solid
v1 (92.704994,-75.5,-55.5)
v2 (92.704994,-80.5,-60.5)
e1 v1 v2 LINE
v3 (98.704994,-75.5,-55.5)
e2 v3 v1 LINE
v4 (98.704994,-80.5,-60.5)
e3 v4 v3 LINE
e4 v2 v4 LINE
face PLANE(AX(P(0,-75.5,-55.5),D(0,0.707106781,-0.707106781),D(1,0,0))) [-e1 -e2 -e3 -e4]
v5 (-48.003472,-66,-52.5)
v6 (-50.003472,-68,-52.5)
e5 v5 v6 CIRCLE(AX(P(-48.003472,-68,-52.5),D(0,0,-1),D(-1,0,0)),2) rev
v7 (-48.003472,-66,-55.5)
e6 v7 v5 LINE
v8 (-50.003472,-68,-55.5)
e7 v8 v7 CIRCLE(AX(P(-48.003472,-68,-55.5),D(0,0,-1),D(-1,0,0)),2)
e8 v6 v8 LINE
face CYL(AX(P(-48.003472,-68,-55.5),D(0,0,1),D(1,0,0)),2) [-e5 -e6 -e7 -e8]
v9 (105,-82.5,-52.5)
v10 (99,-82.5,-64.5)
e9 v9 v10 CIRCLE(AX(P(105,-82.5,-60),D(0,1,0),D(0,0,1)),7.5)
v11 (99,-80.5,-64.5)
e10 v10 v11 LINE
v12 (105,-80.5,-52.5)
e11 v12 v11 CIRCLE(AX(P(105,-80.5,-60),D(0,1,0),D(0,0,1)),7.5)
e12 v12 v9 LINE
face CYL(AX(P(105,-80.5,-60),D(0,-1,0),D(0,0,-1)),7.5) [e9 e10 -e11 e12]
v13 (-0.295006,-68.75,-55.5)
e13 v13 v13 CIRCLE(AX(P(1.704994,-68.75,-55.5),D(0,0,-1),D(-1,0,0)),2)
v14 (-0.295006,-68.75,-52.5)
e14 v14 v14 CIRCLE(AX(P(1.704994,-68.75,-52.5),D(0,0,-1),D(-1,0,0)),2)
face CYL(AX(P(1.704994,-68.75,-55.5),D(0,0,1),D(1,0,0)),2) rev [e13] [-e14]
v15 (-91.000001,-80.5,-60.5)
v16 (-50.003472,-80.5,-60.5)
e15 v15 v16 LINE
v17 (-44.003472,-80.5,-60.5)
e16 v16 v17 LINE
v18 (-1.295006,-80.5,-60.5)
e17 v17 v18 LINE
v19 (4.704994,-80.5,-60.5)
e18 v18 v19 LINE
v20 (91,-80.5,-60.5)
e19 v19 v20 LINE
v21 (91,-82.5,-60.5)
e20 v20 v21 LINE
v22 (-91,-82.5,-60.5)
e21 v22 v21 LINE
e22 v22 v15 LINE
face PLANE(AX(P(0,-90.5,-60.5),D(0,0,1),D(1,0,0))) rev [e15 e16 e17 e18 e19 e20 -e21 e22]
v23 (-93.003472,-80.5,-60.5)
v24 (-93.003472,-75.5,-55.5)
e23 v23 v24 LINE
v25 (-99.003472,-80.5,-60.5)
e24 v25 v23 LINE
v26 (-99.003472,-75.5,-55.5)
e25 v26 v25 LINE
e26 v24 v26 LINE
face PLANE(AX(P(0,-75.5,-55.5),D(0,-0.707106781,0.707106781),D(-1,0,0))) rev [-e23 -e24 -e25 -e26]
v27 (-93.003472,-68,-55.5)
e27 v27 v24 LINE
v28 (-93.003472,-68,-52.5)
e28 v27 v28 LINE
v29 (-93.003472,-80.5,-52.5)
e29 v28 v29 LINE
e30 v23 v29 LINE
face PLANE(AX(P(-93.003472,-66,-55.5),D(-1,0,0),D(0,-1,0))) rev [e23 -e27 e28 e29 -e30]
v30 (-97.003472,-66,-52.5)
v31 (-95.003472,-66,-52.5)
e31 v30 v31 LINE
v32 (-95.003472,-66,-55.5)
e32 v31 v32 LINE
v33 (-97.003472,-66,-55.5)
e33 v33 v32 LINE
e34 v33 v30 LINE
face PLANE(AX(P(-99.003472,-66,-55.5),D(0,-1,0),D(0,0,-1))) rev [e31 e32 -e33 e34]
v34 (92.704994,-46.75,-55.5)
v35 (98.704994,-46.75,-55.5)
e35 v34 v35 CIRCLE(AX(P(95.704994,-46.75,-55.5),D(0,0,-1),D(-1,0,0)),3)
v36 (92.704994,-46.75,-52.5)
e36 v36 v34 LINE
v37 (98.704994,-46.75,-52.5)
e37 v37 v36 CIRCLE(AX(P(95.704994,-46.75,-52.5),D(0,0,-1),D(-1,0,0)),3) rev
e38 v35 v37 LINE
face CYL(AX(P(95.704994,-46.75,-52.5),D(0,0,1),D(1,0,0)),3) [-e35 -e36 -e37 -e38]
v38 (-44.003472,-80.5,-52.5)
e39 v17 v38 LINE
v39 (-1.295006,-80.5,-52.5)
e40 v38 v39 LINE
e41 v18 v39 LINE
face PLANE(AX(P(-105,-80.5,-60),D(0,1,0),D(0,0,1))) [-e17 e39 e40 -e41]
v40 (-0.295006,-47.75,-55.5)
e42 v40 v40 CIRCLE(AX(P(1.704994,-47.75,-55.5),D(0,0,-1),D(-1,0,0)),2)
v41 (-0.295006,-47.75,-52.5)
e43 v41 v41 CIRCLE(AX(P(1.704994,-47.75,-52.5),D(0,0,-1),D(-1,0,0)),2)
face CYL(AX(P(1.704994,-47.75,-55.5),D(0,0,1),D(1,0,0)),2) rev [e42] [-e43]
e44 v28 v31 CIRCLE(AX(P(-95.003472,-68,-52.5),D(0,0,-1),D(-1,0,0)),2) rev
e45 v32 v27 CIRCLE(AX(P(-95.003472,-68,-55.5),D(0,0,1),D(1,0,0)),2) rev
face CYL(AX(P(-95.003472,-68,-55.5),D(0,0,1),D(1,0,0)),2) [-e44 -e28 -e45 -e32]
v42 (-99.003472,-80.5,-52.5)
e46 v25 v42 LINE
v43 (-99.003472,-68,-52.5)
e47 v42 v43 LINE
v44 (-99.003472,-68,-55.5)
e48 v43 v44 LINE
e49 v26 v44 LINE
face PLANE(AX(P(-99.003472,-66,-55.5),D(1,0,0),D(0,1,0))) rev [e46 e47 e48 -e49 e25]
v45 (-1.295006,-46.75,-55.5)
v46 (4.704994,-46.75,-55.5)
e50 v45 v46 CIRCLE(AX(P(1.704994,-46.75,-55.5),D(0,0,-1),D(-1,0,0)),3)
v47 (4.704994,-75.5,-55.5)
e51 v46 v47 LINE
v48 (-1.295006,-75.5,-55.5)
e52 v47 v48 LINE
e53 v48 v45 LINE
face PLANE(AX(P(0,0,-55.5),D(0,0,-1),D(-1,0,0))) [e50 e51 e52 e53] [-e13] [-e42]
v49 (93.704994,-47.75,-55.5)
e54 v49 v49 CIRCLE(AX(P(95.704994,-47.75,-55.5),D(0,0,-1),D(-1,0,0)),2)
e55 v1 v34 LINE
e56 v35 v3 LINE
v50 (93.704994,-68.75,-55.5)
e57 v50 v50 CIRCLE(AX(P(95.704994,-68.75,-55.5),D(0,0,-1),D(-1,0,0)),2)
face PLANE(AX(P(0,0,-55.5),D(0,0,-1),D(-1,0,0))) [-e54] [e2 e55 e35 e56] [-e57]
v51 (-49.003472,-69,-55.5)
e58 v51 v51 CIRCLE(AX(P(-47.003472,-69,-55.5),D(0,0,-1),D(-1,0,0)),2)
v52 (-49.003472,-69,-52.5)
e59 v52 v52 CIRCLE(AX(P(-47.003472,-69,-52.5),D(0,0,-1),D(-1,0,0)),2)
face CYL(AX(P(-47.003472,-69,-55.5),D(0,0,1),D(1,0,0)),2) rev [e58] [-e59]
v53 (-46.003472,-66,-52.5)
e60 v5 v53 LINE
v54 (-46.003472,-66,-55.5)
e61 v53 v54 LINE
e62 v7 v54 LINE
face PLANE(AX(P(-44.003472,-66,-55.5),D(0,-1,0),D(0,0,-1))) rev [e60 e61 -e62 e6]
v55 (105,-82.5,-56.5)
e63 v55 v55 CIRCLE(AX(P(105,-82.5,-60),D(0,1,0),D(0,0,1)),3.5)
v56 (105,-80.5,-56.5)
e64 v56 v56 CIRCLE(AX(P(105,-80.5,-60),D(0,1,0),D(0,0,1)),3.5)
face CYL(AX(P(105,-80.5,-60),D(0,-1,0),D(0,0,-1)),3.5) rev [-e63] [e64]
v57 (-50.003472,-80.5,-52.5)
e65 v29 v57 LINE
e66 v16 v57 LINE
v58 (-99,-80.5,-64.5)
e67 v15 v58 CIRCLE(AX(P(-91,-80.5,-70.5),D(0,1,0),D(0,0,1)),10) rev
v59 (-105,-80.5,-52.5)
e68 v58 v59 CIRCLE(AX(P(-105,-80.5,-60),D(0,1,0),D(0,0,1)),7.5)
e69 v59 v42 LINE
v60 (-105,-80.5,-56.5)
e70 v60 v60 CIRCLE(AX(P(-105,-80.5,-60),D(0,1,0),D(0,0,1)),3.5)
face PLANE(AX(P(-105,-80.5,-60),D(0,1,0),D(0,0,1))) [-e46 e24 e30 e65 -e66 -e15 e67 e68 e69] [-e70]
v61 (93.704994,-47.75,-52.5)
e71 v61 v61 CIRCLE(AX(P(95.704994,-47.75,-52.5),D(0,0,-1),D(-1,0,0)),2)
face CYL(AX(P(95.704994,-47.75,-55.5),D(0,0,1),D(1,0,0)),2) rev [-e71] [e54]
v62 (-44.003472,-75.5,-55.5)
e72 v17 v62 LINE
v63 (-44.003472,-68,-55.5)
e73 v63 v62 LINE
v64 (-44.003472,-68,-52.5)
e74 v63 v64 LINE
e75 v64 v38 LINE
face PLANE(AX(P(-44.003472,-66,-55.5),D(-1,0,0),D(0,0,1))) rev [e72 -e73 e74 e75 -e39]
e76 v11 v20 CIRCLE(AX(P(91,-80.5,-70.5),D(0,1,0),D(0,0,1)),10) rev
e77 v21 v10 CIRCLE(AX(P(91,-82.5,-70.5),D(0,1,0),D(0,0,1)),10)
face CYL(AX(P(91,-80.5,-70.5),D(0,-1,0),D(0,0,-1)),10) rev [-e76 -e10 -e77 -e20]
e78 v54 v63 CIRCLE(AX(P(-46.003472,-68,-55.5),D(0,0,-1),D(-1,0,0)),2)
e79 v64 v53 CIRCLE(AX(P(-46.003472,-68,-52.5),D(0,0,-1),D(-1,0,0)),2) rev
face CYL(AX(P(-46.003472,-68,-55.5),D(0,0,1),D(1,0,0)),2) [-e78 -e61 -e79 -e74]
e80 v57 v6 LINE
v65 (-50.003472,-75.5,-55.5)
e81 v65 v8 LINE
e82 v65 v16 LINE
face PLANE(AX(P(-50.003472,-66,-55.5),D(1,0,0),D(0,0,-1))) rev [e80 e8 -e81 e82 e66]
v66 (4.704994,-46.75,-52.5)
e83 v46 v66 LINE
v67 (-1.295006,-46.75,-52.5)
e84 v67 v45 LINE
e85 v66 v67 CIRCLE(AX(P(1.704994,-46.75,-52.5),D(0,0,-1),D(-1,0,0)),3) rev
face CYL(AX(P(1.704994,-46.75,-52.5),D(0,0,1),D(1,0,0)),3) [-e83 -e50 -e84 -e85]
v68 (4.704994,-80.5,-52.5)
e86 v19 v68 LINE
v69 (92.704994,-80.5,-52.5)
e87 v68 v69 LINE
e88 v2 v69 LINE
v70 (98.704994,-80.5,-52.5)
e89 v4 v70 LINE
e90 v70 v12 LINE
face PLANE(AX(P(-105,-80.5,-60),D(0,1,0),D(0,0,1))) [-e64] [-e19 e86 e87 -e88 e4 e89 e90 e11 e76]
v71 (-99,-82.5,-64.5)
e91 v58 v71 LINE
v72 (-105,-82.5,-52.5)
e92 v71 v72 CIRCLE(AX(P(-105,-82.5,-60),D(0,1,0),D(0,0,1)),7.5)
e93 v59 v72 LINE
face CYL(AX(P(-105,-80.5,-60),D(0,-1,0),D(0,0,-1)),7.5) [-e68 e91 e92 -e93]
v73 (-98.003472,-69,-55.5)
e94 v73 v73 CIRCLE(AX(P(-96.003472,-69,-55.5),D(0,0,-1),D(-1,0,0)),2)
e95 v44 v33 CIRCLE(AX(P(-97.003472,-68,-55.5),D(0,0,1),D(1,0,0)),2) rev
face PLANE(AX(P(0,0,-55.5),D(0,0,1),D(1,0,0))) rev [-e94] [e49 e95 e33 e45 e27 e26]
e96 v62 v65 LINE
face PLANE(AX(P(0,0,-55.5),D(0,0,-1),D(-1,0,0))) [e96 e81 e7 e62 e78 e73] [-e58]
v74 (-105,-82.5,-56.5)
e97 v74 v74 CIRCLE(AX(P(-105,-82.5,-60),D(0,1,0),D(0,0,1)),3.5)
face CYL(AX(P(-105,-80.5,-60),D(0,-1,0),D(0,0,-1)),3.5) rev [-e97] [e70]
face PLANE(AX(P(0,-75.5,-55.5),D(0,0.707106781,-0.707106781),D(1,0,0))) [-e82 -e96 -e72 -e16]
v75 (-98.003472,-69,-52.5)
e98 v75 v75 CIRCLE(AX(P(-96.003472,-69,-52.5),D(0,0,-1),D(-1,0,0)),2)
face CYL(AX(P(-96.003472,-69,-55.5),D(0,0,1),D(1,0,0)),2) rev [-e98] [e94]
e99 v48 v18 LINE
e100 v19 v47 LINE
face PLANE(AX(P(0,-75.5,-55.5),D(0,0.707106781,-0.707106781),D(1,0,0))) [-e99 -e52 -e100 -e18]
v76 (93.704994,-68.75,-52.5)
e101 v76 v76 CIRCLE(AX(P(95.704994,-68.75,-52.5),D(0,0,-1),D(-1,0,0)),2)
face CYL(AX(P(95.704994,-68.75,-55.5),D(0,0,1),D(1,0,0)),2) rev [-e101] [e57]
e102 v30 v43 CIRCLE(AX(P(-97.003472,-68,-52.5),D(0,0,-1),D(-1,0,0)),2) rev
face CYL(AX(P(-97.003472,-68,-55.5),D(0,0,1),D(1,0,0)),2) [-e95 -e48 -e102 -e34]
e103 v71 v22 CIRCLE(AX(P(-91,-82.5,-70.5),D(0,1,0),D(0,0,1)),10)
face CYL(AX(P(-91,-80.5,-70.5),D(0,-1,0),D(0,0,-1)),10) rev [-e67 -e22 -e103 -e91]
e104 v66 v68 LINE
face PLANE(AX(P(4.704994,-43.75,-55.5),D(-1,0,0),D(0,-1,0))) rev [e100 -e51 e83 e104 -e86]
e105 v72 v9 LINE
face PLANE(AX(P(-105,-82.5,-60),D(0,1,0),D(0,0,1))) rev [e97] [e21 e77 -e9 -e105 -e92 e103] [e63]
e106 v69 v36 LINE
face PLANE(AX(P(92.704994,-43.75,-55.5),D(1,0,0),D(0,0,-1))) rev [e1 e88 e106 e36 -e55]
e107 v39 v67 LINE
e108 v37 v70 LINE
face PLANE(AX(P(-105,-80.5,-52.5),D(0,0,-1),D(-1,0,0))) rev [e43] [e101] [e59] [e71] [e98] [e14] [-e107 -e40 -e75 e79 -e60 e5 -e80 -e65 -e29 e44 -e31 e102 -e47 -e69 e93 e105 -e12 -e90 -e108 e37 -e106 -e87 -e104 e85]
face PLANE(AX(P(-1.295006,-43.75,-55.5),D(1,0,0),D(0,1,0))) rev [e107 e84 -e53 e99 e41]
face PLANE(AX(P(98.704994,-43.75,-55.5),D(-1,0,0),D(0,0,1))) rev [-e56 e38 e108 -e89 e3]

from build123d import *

# Parameters (mm, degrees)
SKETCH1_R           = 3.5
BOSS_EXTRUDE1_DEPTH = 2
SKETCH2_W           = 6
SKETCH2_H           = 36.75
SKETCH2_R           = 2
SKETCH2_H_2         = 14.5
BOSS_EXTRUDE2_DEPTH = 3
FILLET1_RADIUS      = 3
FILLET1_LENGTH      = 3
FILLET2_RADIUS      = 3
FILLET2_LENGTH      = 3
FILLET3_R           = 2
CHAMFER1_SIZE       = 5
CUT_EXTRUDE1_START  = -10
CUT_EXTRUDE1_DEPTH  = 10
FILLET4_R           = 10


with BuildPart() as part:
    # Sketch1 → Boss-Extrude1 (new body)
    with BuildSketch(Plane(origin=(0, -82.5, 0), x_dir=(1, 0, 0), z_dir=(0, 1, 0))):
        with BuildLine():
            Line((-105, 67.5), (105, 67.5))
            ThreePointArc((105, 67.5), (112.5, 60), (105, 52.5))
            Line((105, 52.5), (-105, 52.5))
            ThreePointArc((-105, 52.5), (-112.5, 60), (-105, 67.5))
        make_face()
        with Locations(Location((-105, 60, 0), (0, 0, 270))):
            Circle(SKETCH1_R, mode=Mode.SUBTRACT)
        with Locations(Location((105, 60, 0), (0, 0, 270))):
            Circle(SKETCH1_R, mode=Mode.SUBTRACT)
    extrude(amount=BOSS_EXTRUDE1_DEPTH)

    # Sketch2 → Boss-Extrude2 (add)
    # profile 1 of 4: a face of its own
    with BuildSketch(Plane(origin=(0, 0, -52.5), x_dir=(-1, 0, 0), z_dir=(0, 0, -1))):
        with Locations((-95.704993888, -62.125)):
            Rectangle(SKETCH2_W, SKETCH2_H)
        with Locations((-95.704993888, -47.75)):
            Circle(SKETCH2_R, mode=Mode.SUBTRACT)
        with Locations((-95.704993888, -68.75)):
            Circle(SKETCH2_R, mode=Mode.SUBTRACT)
    # profile 2 of 4: a face of its own
    with BuildSketch(Plane(origin=(0, 0, -52.5), x_dir=(-1, 0, 0), z_dir=(0, 0, -1))):
        with Locations((-1.704993888, -62.125)):
            Rectangle(SKETCH2_W, SKETCH2_H)
        with Locations((-1.704993888, -47.75)):
            Circle(SKETCH2_R, mode=Mode.SUBTRACT)
        with Locations((-1.704993888, -68.75)):
            Circle(SKETCH2_R, mode=Mode.SUBTRACT)
    # profile 3 of 4: a face of its own
    with BuildSketch(Plane(origin=(0, 0, -52.5), x_dir=(-1, 0, 0), z_dir=(0, 0, -1))):
        with Locations((47.003472144, -73.25)):
            Rectangle(SKETCH2_W, SKETCH2_H_2)
        with Locations((47.003472144, -69)):
            Circle(SKETCH2_R, mode=Mode.SUBTRACT)
    # profile 4 of 4: a face of its own
    with BuildSketch(Plane(origin=(0, 0, -52.5), x_dir=(-1, 0, 0), z_dir=(0, 0, -1))):
        with Locations((96.003472144, -73.25)):
            Rectangle(SKETCH2_W, SKETCH2_H_2)
        with Locations((96.003472144, -69)):
            Circle(SKETCH2_R, mode=Mode.SUBTRACT)
    extrude(amount=BOSS_EXTRUDE2_DEPTH)

    # Fillet1: full round fillet: the end face becomes a half cylinder, R = half its width
    fillet1_face = Plane((95.704993888, -43.75, -54), x_dir=(0, 0, -1), z_dir=(0, 1, 0))  # on the end face: x along it, z out of the body
    fillet1_slab = fillet1_face.offset(-FILLET1_RADIUS / 2) * Box(FILLET1_LENGTH, 2 * FILLET1_RADIUS, FILLET1_RADIUS, mode=Mode.PRIVATE)  # the body's end, R deep
    fillet1_round = Plane((95.704993888, -46.75, -54), x_dir=(0, 1, 0), z_dir=(0, 0, -1)) * Cylinder(FILLET1_RADIUS, FILLET1_LENGTH, mode=Mode.PRIVATE)  # its axis R under the face
    add(fillet1_slab - fillet1_round, mode=Mode.SUBTRACT)

    # Fillet2: full round fillet: the end face becomes a half cylinder, R = half its width
    fillet2_face = Plane((1.704993888, -43.75, -54), x_dir=(0, 0, -1), z_dir=(0, 1, 0))  # on the end face: x along it, z out of the body
    fillet2_slab = fillet2_face.offset(-FILLET2_RADIUS / 2) * Box(FILLET2_LENGTH, 2 * FILLET2_RADIUS, FILLET2_RADIUS, mode=Mode.PRIVATE)  # the body's end, R deep
    fillet2_round = Plane((1.704993888, -46.75, -54), x_dir=(0, 1, 0), z_dir=(0, 0, -1)) * Cylinder(FILLET2_RADIUS, FILLET2_LENGTH, mode=Mode.PRIVATE)  # its axis R under the face
    add(fillet2_slab - fillet2_round, mode=Mode.SUBTRACT)

    # Fillet3
    fillet3_edges = [part.edges().sort_by_distance(p)[0] for p in [
        (-44.003472144, -66, -54),
        (-50.003472144, -66, -54),
        (-99.003472144, -66, -54),
        (-93.003472144, -66, -54),
    ]]
    fillet(fillet3_edges, radius=FILLET3_R)

    # Chamfer1
    chamfer1_edges = [part.edges().sort_by_distance(p)[0] for p in [
        (95.704993888, -80.5, -55.5),
        (1.704993888, -80.5, -55.5),
        (-47.003472144, -80.5, -55.5),
        (-96.003472144, -80.5, -55.5),
    ]]
    chamfer(chamfer1_edges, length=CHAMFER1_SIZE)

    # Sketch3 → Cut-Extrude1 (cut)
    with BuildSketch(Plane(origin=(0, -80.5, 0), x_dir=(1, 0, 0), z_dir=(0, 1, 0)).offset(CUT_EXTRUDE1_START)):
        with BuildLine():
            Line((92.704993888, 60.5), (97.516685226, 60.5))
            ThreePointArc((97.516685226, 60.5), (99.876524617, 65.477225575), (105, 67.5))
            Line((105, 67.5), (-105, 67.5))
            ThreePointArc((-105, 67.5), (-99.876524617, 65.477225575), (-97.516685226, 60.5))
            Line((-97.516685226, 60.5), (-93.003472144, 60.5))
            Line((-93.003472144, 60.5), (-50.003472144, 60.5))
            Line((-50.003472144, 60.5), (-44.003472144, 60.5))
            Line((-44.003472144, 60.5), (-1.295006112, 60.5))
            Line((-1.295006112, 60.5), (4.704993888, 60.5))
            Line((4.704993888, 60.5), (92.704993888, 60.5))
        make_face()
    extrude(amount=CUT_EXTRUDE1_DEPTH, mode=Mode.SUBTRACT)

    # Fillet4
    # the kernel refuses this fillet: 10 mm, written as the material it adds along each edge
    with BuildSketch(Plane(origin=(97.516685226, -82.5, -60.5), x_dir=(-1, 0, 0), z_dir=(0, 1, 0))) as fillet4_piece_1_section:
        with BuildLine():
            CenterArc((6.516685226, -10), FILLET4_R, 90, 53.130102354)
            ThreePointArc((-1.483314774, -4), (-0.451249336, -2.107691638), (0, 0))
            Line((0, 0), (6.516685226, 0))
        make_face()
    fillet4_piece_1 = extrude(amount=2, mode=Mode.PRIVATE)
    fillet4_piece_1 = split(fillet4_piece_1, bisect_by=Plane(origin=(95.39414114, -81.261061564, -61.261061564), z_dir=(0, -0.7071067811865476, 0.7071067811865476)), keep=Keep.TOP, mode=Mode.PRIVATE)
    add(fillet4_piece_1)
    with BuildSketch(Plane(origin=(97.516685226, -82.5, -60.5), x_dir=(-1, 0, 0), z_dir=(0, 1, 0))) as fillet4_piece_2_section:
        with BuildLine():
            CenterArc((6.516685226, -10), FILLET4_R, 90, 53.130102354)
            ThreePointArc((-1.483314774, -4), (-0.451249336, -2.107691638), (0, 0))
            Line((0, 0), (6.516685226, 0))
        make_face()
    fillet4_piece_2 = extrude(amount=2, mode=Mode.PRIVATE)
    fillet4_piece_2 = split(fillet4_piece_2, bisect_by=Plane(origin=(97.181808866, -81.694028368, -61.694028368), z_dir=(0, 0.7071067811865476, -0.7071067811865476)), keep=Keep.TOP, mode=Mode.PRIVATE)
    add(fillet4_piece_2)
    with BuildSketch(Plane(origin=(-97.516685226, -82.5, -60.5), x_dir=(1, 0, 0), z_dir=(0, 1, 0))) as fillet4_piece_3_section:
        with BuildLine():
            CenterArc((6.516685226, 10), FILLET4_R, 216.869897646, 53.130102354)
            ThreePointArc((-1.483314774, 4), (-0.451249336, 2.107691638), (0, 0))
            Line((0, 0), (6.516685226, 0))
        make_face()
    fillet4_piece_3 = extrude(amount=2, mode=Mode.PRIVATE)
    fillet4_piece_3 = split(fillet4_piece_3, bisect_by=Plane(origin=(-95.39414114, -81.261061564, -61.261061564), z_dir=(0, -0.7071067811865476, 0.7071067811865476)), keep=Keep.TOP, mode=Mode.PRIVATE)
    add(fillet4_piece_3)
    with BuildSketch(Plane(origin=(-97.516685226, -82.5, -60.5), x_dir=(1, 0, 0), z_dir=(0, 1, 0))) as fillet4_piece_4_section:
        with BuildLine():
            CenterArc((6.516685226, 10), FILLET4_R, 216.869897646, 53.130102354)
            ThreePointArc((-1.483314774, 4), (-0.451249336, 2.107691638), (0, 0))
            Line((0, 0), (6.516685226, 0))
        make_face()
    fillet4_piece_4 = extrude(amount=2, mode=Mode.PRIVATE)
    fillet4_piece_4 = split(fillet4_piece_4, bisect_by=Plane(origin=(-97.181808866, -81.694028368, -61.694028368), z_dir=(0, 0.7071067811865476, -0.7071067811865476)), keep=Keep.TOP, mode=Mode.PRIVATE)
    add(fillet4_piece_4)


solid = part.part
